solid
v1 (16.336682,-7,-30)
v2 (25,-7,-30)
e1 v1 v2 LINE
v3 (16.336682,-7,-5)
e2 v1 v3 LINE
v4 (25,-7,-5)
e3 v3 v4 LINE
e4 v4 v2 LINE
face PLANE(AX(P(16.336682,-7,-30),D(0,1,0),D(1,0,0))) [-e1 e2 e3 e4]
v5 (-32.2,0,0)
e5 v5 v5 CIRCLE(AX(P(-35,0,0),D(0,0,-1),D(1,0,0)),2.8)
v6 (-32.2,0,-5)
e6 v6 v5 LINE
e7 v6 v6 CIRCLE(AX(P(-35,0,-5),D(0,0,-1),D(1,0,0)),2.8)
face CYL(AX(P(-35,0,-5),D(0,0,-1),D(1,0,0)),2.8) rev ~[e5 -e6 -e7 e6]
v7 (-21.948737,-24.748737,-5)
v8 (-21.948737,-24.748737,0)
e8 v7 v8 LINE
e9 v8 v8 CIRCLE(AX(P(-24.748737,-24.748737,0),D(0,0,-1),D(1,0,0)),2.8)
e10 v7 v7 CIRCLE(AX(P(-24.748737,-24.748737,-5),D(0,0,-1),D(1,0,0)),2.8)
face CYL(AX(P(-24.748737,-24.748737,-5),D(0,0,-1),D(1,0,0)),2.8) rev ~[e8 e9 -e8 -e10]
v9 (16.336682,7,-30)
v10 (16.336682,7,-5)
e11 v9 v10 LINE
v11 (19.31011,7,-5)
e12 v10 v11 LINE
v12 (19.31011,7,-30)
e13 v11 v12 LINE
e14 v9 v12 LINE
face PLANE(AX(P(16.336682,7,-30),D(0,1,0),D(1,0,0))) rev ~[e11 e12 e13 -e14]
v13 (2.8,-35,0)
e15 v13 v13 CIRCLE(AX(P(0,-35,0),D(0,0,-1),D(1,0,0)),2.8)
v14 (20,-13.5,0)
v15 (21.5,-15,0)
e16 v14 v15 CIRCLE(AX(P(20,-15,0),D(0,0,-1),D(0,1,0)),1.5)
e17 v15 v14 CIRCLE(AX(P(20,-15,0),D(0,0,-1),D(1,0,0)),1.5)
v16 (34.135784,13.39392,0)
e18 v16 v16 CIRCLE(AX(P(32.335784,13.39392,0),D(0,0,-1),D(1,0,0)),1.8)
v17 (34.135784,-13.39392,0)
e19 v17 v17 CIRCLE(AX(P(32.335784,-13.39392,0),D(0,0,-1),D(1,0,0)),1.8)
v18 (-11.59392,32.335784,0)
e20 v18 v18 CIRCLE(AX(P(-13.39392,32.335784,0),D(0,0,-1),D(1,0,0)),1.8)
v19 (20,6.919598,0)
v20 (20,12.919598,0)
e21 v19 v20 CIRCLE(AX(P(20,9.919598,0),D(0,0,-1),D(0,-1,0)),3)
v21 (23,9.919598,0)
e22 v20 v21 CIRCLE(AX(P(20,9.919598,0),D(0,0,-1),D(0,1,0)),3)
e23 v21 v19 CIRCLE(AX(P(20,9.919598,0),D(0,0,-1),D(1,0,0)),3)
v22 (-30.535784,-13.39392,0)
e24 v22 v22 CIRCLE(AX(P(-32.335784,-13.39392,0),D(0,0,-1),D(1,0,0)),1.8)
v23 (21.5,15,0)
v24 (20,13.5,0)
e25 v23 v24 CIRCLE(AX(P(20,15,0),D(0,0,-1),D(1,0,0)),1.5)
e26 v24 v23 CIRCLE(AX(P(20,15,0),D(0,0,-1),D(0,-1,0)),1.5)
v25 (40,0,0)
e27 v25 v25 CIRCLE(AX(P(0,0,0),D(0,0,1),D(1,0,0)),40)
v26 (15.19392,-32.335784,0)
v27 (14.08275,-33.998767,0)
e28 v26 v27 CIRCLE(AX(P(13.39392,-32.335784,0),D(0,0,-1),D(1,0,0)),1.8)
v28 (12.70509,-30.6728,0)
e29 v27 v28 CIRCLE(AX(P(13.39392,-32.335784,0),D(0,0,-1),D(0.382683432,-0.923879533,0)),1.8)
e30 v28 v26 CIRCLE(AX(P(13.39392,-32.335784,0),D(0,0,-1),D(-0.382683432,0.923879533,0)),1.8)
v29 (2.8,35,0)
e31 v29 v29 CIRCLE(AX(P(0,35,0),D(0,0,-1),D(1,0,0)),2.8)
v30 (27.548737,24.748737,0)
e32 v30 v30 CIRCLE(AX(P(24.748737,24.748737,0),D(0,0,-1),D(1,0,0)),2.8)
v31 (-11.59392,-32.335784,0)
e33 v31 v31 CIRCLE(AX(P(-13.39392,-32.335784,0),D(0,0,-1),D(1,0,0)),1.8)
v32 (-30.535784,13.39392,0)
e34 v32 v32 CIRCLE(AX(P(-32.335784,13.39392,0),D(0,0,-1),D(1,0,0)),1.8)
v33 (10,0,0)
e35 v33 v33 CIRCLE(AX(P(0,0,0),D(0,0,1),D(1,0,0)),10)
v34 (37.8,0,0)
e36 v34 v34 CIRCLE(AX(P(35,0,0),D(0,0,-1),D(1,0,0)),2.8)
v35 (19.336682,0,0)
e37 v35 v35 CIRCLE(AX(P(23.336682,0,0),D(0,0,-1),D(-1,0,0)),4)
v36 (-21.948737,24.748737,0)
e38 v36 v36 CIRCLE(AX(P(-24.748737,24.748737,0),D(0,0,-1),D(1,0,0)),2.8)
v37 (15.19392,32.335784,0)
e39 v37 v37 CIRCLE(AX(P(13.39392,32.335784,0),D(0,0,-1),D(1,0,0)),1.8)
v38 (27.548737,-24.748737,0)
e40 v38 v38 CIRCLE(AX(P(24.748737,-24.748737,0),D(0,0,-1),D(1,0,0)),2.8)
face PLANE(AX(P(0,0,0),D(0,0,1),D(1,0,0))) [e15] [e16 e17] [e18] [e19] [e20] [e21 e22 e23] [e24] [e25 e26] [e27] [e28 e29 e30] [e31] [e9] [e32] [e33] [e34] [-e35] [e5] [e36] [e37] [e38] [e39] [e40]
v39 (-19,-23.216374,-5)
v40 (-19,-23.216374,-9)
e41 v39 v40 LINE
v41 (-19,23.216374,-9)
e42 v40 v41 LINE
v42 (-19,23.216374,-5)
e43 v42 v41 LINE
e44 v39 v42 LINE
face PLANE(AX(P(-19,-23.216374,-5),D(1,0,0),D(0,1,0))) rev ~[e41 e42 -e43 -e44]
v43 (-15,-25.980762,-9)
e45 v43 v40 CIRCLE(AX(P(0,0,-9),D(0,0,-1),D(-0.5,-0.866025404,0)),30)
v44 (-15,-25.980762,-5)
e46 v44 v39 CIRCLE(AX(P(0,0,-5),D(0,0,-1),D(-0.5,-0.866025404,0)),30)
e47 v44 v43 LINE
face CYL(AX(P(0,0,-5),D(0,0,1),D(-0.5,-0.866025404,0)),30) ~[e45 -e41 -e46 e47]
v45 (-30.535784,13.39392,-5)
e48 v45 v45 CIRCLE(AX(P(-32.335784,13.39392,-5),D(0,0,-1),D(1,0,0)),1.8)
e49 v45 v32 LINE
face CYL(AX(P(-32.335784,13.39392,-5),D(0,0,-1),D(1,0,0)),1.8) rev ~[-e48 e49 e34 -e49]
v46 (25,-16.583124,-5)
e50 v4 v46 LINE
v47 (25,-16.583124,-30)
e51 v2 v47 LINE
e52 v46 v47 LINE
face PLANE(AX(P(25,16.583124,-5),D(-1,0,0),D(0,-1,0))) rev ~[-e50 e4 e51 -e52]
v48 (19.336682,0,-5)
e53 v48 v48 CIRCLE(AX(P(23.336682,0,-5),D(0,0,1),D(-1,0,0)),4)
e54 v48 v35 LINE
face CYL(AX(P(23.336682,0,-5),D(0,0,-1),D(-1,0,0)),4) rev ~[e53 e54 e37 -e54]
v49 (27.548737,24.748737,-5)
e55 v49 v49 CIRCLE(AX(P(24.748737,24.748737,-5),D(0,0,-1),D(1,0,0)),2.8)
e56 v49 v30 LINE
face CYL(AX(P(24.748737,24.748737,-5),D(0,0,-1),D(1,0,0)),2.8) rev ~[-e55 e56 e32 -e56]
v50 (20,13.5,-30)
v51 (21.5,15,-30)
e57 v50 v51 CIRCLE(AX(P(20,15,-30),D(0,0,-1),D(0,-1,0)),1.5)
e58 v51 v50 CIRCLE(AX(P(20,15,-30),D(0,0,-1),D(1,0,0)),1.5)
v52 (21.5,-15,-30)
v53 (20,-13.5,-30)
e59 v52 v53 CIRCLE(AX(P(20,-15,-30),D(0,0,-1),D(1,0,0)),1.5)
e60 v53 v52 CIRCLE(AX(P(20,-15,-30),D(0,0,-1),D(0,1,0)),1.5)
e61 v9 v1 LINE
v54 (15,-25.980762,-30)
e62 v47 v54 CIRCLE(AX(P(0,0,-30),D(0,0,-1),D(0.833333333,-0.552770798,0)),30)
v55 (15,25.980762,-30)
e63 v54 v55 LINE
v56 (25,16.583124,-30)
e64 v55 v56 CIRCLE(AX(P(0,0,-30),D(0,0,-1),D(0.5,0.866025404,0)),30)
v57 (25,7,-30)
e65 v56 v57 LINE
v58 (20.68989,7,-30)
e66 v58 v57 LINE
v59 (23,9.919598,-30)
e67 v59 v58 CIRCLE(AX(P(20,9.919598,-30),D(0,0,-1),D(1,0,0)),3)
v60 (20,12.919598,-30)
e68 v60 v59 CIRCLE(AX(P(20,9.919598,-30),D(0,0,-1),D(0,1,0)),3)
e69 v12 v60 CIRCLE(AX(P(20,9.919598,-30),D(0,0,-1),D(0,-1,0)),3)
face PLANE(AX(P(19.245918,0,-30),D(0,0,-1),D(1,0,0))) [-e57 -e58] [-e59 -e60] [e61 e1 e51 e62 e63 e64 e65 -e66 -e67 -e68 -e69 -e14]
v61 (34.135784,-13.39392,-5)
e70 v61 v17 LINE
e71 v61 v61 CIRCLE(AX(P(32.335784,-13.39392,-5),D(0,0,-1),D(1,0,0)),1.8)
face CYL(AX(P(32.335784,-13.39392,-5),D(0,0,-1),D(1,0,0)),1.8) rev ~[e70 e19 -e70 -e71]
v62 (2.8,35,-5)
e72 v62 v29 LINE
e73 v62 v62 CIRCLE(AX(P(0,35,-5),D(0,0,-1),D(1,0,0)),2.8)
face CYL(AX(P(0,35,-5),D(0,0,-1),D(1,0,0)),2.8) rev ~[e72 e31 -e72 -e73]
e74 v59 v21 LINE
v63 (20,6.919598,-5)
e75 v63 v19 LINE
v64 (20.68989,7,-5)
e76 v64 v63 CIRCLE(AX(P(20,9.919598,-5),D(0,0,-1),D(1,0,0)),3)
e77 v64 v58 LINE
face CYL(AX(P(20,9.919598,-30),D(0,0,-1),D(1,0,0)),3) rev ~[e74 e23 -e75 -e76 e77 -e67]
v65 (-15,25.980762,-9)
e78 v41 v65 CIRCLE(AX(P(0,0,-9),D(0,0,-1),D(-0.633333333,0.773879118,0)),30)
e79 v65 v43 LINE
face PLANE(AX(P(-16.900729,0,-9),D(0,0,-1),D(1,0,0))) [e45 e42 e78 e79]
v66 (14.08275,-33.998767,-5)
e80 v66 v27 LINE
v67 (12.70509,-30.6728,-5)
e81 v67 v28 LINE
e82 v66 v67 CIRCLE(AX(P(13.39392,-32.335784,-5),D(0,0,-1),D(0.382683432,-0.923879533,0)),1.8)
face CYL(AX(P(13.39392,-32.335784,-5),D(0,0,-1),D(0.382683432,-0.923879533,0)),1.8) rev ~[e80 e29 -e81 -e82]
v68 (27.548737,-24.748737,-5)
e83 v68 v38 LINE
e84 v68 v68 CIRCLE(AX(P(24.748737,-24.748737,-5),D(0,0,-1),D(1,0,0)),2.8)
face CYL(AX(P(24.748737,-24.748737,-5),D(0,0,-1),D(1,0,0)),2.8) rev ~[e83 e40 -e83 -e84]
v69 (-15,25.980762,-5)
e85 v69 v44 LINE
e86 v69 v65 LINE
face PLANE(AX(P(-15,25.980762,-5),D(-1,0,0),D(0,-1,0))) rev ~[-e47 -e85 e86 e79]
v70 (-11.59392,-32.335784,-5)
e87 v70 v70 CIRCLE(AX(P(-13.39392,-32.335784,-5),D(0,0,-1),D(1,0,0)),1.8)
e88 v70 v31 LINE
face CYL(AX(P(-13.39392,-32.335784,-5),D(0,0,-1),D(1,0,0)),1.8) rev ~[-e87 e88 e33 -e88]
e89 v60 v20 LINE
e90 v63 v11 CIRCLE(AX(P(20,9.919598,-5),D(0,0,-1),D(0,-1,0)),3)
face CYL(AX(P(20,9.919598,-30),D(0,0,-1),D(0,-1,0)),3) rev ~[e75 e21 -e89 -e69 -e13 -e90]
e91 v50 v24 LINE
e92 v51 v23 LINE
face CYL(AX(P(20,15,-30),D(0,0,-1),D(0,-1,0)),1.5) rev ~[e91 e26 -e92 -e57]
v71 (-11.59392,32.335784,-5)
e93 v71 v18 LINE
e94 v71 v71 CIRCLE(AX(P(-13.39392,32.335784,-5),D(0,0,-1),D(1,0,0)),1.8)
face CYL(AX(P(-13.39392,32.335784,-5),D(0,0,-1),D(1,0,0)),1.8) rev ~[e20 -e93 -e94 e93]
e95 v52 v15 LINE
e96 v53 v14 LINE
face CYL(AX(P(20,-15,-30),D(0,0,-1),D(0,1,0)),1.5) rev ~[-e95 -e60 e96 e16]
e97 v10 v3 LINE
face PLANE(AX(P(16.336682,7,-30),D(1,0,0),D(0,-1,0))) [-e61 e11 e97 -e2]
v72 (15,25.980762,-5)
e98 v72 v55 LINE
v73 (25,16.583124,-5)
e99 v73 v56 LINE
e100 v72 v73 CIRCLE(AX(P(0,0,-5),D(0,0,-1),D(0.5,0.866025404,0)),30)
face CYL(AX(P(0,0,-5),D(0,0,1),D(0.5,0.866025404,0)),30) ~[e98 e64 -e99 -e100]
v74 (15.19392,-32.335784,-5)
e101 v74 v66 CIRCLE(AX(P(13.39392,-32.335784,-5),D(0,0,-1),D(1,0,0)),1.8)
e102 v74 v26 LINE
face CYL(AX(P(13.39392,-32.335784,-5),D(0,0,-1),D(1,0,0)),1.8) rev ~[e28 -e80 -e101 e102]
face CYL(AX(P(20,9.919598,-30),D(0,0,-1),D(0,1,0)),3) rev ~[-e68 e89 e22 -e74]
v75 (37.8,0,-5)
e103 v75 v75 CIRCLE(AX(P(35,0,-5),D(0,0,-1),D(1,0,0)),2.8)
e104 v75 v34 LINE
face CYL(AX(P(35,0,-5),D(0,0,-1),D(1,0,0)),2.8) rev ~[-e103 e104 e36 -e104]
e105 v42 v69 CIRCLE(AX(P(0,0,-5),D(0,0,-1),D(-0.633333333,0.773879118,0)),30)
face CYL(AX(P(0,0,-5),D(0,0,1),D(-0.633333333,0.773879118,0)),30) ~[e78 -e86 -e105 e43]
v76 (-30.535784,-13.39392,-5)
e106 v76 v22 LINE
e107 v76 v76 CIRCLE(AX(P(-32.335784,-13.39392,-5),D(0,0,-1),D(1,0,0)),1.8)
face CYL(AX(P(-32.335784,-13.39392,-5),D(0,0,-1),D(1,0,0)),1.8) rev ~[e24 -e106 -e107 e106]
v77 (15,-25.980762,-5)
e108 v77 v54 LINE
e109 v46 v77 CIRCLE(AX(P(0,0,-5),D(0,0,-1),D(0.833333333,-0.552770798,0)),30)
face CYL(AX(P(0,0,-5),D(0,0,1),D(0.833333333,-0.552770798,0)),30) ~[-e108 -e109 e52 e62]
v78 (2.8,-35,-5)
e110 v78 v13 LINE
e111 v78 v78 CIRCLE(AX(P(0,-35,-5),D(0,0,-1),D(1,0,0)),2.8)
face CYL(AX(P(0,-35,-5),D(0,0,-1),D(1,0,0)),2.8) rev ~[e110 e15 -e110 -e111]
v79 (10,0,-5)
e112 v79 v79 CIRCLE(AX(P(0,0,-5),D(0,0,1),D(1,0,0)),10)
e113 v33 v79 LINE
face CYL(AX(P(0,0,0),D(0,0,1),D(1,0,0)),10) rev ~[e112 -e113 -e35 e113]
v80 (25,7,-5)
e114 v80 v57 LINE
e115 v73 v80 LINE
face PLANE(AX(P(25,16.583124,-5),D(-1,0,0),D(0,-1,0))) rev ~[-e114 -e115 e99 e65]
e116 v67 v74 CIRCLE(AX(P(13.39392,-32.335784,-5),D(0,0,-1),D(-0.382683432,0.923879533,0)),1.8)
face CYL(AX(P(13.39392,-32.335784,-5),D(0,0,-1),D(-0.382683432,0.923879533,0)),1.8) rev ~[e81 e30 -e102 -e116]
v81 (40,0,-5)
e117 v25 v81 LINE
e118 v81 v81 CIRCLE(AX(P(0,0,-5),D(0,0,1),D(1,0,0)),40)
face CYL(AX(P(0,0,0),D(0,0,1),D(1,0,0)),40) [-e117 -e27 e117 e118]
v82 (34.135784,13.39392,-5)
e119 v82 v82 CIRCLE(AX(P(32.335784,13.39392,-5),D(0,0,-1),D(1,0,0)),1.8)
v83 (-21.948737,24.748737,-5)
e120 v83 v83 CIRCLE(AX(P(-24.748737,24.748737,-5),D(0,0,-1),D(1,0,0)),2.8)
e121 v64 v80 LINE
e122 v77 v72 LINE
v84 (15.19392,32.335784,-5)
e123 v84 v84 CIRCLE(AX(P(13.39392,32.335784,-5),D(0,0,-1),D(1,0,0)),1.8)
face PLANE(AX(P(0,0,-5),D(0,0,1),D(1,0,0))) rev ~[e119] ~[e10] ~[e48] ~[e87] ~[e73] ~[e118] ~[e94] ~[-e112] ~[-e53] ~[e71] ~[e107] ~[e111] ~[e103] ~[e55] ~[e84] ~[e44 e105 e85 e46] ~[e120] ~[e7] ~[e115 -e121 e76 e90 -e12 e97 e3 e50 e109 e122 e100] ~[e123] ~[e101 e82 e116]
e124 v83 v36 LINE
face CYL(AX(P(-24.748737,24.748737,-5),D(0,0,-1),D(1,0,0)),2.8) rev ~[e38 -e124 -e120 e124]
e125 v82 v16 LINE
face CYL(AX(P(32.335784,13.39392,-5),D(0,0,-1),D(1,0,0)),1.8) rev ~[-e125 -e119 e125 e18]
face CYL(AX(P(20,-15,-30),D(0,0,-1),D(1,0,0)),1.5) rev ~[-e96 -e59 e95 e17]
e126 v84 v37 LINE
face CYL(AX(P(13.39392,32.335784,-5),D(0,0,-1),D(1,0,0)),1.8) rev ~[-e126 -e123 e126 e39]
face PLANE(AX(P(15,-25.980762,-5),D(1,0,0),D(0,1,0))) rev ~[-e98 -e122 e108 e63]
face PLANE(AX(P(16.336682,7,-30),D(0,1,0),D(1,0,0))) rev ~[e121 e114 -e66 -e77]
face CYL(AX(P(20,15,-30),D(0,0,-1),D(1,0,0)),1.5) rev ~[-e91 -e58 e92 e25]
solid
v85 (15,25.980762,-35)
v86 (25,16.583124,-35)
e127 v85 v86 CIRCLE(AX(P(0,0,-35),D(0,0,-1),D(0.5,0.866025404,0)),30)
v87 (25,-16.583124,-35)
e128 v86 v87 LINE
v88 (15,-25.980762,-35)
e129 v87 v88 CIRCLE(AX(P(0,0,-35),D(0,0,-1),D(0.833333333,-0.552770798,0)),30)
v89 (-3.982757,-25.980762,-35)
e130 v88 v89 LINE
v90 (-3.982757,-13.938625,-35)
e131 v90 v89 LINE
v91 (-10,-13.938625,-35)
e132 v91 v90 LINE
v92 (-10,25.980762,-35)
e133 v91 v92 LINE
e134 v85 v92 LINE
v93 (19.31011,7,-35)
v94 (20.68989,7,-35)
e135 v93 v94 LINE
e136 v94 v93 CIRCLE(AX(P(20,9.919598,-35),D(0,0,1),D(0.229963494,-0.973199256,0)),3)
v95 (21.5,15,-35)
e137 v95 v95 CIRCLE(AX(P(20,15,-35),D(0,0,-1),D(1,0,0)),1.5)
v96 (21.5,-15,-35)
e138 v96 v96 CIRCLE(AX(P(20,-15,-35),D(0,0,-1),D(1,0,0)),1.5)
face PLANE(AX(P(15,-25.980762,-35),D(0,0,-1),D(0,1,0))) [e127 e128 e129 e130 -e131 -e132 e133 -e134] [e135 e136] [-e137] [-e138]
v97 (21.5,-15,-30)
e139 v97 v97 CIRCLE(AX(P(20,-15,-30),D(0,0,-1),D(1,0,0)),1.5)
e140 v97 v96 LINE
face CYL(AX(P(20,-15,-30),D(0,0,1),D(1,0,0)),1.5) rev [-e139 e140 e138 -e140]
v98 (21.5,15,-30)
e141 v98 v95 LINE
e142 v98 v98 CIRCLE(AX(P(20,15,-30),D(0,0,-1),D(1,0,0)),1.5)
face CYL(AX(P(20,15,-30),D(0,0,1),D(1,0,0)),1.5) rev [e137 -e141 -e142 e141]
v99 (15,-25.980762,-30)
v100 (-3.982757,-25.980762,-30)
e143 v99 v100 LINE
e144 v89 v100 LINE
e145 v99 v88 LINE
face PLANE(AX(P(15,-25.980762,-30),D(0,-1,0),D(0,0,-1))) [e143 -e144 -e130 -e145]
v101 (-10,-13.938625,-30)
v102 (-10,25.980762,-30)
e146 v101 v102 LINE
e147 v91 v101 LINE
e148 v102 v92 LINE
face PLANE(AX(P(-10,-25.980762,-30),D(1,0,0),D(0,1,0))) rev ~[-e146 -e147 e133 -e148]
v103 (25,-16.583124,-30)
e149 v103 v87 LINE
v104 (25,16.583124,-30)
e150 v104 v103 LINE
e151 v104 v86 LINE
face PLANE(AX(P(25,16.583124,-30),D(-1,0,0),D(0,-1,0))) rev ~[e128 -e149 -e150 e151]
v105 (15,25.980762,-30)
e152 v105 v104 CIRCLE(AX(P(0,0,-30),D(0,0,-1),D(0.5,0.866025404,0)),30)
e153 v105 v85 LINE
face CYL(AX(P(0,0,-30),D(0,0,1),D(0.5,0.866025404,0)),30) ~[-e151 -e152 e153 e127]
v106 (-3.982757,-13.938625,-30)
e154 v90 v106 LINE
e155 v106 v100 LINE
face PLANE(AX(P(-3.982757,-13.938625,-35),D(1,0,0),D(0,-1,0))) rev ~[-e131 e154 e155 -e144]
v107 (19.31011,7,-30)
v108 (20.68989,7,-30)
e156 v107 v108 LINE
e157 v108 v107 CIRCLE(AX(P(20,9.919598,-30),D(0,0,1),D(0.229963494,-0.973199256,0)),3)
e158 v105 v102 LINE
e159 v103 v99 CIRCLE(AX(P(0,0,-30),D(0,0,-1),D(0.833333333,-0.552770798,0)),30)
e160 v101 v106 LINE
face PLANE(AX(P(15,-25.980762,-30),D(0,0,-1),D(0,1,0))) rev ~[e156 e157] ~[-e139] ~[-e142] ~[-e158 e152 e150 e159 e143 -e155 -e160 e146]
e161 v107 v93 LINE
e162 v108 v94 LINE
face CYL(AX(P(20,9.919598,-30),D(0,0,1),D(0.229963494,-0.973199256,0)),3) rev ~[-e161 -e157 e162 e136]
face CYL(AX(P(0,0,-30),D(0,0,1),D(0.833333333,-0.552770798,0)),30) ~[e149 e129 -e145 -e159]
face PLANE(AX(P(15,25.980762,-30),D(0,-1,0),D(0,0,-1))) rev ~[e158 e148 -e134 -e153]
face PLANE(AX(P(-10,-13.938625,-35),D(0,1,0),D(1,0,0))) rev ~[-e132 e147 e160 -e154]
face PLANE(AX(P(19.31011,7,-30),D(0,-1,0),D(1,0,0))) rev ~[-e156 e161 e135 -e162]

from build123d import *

# Parameters (mm, degrees)
F0_R      = 40
F0_R_2    = 10
F1_DEPTH  = 5
F3_DEPTH  = 4
F4_DEPTH  = 25
F6_DEPTH  = 30.7
F7_R      = 2.8
F8_DEPTH  = 25
F9_R      = 1.8
F10_DEPTH = 25
F12_DEPTH = 25
F13_W     = 14
F13_H     = 14
F14_DEPTH = 25
F15_R     = 1.5
F16_DEPTH = 5
F17_DEPTH = 25
F18_W     = 6.0172432475
F18_H     = 12.0421367704
F19_DEPTH = 25


with BuildPart() as f1:
    # F0 (on Top) → F1 (new body)
    with BuildSketch(Plane.XY):
        Circle(F0_R)
        Circle(F0_R_2, mode=Mode.SUBTRACT)
    extrude(amount=-F1_DEPTH)

    # F2 (on face) → F3 (join)
    with BuildSketch(Plane(origin=(0, 0, -5), x_dir=(1, 0, 0), z_dir=(0, 0, -1))):
        with BuildLine():
            Line((-15, -25.9807621135), (-15, 25.9807621135))
            ThreePointArc((-15, 25.9807621135), (-17.0560974744, 24.6797394424), (-19, 23.2163735325))
            Line((-19, 23.2163735325), (-19, -23.2163735325))
            ThreePointArc((-19, -23.2163735325), (-17.0560974744, -24.6797394424), (-15, -25.9807621135))
        make_face()
    extrude(amount=F3_DEPTH)

    # F2 (on face) → F4 (join)
    with BuildSketch(Plane(origin=(0, 0, -5), x_dir=(1, 0, 0), z_dir=(0, 0, -1))):
        with BuildLine():
            ThreePointArc((25, 16.5831239518), (20.5445589087, 21.8614066163), (15, 25.9807621135))
            Line((15, 25.9807621135), (15, -25.9807621135))
            ThreePointArc((15, -25.9807621135), (20.5445589087, -21.8614066163), (25, -16.5831239518))
            Line((25, -16.5831239518), (25, 16.5831239518))
        make_face()
    extrude(amount=F4_DEPTH)

    # F5 (on face) → F6 (cut)
    with BuildSketch(Plane(origin=(0, 0, -30), x_dir=(1, 0, 0), z_dir=(0, 0, -1))):
        with BuildLine():
            ThreePointArc((21.5, -15), (21.0606601718, -13.9393398282), (20, -13.5))
            ThreePointArc((20, -13.5), (18.9393398282, -16.0606601718), (21.5, -15))
        make_face()
        with BuildLine():
            ThreePointArc((23, -9.9195977673), (22.1213203436, -7.7982774237), (20, -6.9195977673))
            Line((20, -6.9195977673), (20, -12.9195977673))
            ThreePointArc((20, -12.9195977673), (22.1213203436, -12.0409181109), (23, -9.9195977673))
        make_face()
        with BuildLine():
            Line((20, -12.9195977673), (20, -6.9195977673))
            ThreePointArc((20, -6.9195977673), (17, -9.9195977673), (20, -12.9195977673))
        make_face()
        with BuildLine():
            ThreePointArc((21.5, 15), (18.9393398282, 16.0606601718), (20, 13.5))
            ThreePointArc((20, 13.5), (21.0606601718, 13.9393398282), (21.5, 15))
        make_face()
    extrude(amount=-F6_DEPTH, mode=Mode.SUBTRACT)

    # F7 (on face) → F8 (cut)
    with BuildSketch(Plane(origin=(0, 0, -5), x_dir=(1, 0, 0), z_dir=(0, 0, -1))):
        with Locations((0, 35)):
            Circle(F7_R)
        with Locations((-24.7487373415, 24.7487373415)):
            Circle(F7_R)
        with Locations((-35, 0)):
            Circle(F7_R)
        with Locations((-24.7487373415, -24.7487373415)):
            Circle(F7_R)
        with Locations((0, -35)):
            Circle(F7_R)
        with Locations((24.7487373415, -24.7487373415)):
            Circle(F7_R)
        with Locations((35, 0)):
            Circle(F7_R)
        with Locations((24.7487373415, 24.7487373415)):
            Circle(F7_R)
    extrude(amount=-F8_DEPTH, mode=Mode.SUBTRACT)

    # F9 (on face) → F10 (cut)
    with BuildSketch(Plane(origin=(0, 0, -5), x_dir=(1, 0, 0), z_dir=(0, 0, -1))):
        with BuildLine():
            ThreePointArc((14.082750311, 33.9987667964), (11.7309369743, 33.0246138162), (12.7050899545, 30.6728004794))
            Line((12.7050899545, 30.6728004794), (14.082750311, 33.9987667964))
        make_face()
        with BuildLine():
            Line((14.082750311, 33.9987667964), (12.7050899545, 30.6728004794))
            ThreePointArc((12.7050899545, 30.6728004794), (14.3939465522, 30.8391383358), (15.1939201328, 32.3357836379))
            ThreePointArc((15.1939201328, 32.3357836379), (14.8905654349, 33.3358100573), (14.082750311, 33.9987667964))
        make_face()
        with Locations((-13.3939201328, 32.3357836379)):
            Circle(F9_R)
        with Locations((-32.3357836379, 13.3939201328)):
            Circle(F9_R)
        with Locations((-32.3357836379, -13.3939201328)):
            Circle(F9_R)
        with Locations((-13.3939201328, -32.3357836379)):
            Circle(F9_R)
        with Locations((13.3939201328, -32.3357836379)):
            Circle(F9_R)
        with Locations((32.3357836379, -13.3939201328)):
            Circle(F9_R)
        with Locations((32.3357836379, 13.3939201328)):
            Circle(F9_R)
    extrude(amount=-F10_DEPTH, mode=Mode.SUBTRACT)

    # F11 (on face) → F12 (cut)
    with BuildSketch(Plane(origin=(0, 0, -5), x_dir=(1, 0, 0), z_dir=(0, 0, -1))):
        with BuildLine():
            ThreePointArc((27.3366824687, 0), (23.3366824687, 4), (19.3366824687, 0))
            Line((19.3366824687, 0), (27.3366824687, 0))
        make_face()
        with BuildLine():
            Line((27.3366824687, 0), (19.3366824687, 0))
            ThreePointArc((19.3366824687, 0), (23.3366824687, -4), (27.3366824687, 0))
        make_face()
    extrude(amount=-F12_DEPTH, mode=Mode.SUBTRACT)

    # F13 (on face) → F14 (cut)
    with BuildSketch(Plane(origin=(0, 0, -30), x_dir=(1, 0, 0), z_dir=(0, 0, -1))):
        with Locations((23.3366824687, 0)):
            Rectangle(F13_W, F13_H)
    extrude(amount=-F14_DEPTH, mode=Mode.SUBTRACT)


with BuildPart() as f16:
    # F15 (on face) → F16 (new body)
    with BuildSketch(Plane(origin=(0, 0, -30), x_dir=(1, 0, 0), z_dir=(0, 0, -1))):
        with BuildLine():
            ThreePointArc((25, 16.5831239518), (20.5445589087, 21.8614066163), (15, 25.9807621135))
            Line((15, 25.9807621135), (15, -25.9807621135))
            ThreePointArc((15, -25.9807621135), (20.5445589087, -21.8614066163), (25, -16.5831239518))
            Line((25, -16.5831239518), (25, -7))
            Line((25, -7), (25, 7))
            Line((25, 7), (25, 16.5831239518))
        make_face()
        with Locations((20, -15)):
            Circle(F15_R, mode=Mode.SUBTRACT)
        with BuildLine():
            ThreePointArc((20.689890482, -7), (20, -12.9195977673), (19.310109518, -7))
            Line((19.310109518, -7), (20.689890482, -7))
        make_face(mode=Mode.SUBTRACT)
        with Locations((20, 15)):
            Circle(F15_R, mode=Mode.SUBTRACT)
    extrude(amount=F16_DEPTH)

    # F17 (add): a face of the model
    f17_faces = [f16.faces().sort_by_distance(p)[0] for p in [
        (15, 0, -32.5),
    ]]
    extrude(f17_faces, amount=F17_DEPTH)

    # F18 (on face) → F19 (cut)
    with BuildSketch(Plane(origin=(0, 0, -35), x_dir=(1, 0, 0), z_dir=(0, 0, -1))):
        with Locations((-6.9913783763, 19.9596937283)):
            Rectangle(F18_W, F18_H)
    extrude(amount=-F19_DEPTH, mode=Mode.SUBTRACT)


solid = Compound([f1.part, f16.part])
